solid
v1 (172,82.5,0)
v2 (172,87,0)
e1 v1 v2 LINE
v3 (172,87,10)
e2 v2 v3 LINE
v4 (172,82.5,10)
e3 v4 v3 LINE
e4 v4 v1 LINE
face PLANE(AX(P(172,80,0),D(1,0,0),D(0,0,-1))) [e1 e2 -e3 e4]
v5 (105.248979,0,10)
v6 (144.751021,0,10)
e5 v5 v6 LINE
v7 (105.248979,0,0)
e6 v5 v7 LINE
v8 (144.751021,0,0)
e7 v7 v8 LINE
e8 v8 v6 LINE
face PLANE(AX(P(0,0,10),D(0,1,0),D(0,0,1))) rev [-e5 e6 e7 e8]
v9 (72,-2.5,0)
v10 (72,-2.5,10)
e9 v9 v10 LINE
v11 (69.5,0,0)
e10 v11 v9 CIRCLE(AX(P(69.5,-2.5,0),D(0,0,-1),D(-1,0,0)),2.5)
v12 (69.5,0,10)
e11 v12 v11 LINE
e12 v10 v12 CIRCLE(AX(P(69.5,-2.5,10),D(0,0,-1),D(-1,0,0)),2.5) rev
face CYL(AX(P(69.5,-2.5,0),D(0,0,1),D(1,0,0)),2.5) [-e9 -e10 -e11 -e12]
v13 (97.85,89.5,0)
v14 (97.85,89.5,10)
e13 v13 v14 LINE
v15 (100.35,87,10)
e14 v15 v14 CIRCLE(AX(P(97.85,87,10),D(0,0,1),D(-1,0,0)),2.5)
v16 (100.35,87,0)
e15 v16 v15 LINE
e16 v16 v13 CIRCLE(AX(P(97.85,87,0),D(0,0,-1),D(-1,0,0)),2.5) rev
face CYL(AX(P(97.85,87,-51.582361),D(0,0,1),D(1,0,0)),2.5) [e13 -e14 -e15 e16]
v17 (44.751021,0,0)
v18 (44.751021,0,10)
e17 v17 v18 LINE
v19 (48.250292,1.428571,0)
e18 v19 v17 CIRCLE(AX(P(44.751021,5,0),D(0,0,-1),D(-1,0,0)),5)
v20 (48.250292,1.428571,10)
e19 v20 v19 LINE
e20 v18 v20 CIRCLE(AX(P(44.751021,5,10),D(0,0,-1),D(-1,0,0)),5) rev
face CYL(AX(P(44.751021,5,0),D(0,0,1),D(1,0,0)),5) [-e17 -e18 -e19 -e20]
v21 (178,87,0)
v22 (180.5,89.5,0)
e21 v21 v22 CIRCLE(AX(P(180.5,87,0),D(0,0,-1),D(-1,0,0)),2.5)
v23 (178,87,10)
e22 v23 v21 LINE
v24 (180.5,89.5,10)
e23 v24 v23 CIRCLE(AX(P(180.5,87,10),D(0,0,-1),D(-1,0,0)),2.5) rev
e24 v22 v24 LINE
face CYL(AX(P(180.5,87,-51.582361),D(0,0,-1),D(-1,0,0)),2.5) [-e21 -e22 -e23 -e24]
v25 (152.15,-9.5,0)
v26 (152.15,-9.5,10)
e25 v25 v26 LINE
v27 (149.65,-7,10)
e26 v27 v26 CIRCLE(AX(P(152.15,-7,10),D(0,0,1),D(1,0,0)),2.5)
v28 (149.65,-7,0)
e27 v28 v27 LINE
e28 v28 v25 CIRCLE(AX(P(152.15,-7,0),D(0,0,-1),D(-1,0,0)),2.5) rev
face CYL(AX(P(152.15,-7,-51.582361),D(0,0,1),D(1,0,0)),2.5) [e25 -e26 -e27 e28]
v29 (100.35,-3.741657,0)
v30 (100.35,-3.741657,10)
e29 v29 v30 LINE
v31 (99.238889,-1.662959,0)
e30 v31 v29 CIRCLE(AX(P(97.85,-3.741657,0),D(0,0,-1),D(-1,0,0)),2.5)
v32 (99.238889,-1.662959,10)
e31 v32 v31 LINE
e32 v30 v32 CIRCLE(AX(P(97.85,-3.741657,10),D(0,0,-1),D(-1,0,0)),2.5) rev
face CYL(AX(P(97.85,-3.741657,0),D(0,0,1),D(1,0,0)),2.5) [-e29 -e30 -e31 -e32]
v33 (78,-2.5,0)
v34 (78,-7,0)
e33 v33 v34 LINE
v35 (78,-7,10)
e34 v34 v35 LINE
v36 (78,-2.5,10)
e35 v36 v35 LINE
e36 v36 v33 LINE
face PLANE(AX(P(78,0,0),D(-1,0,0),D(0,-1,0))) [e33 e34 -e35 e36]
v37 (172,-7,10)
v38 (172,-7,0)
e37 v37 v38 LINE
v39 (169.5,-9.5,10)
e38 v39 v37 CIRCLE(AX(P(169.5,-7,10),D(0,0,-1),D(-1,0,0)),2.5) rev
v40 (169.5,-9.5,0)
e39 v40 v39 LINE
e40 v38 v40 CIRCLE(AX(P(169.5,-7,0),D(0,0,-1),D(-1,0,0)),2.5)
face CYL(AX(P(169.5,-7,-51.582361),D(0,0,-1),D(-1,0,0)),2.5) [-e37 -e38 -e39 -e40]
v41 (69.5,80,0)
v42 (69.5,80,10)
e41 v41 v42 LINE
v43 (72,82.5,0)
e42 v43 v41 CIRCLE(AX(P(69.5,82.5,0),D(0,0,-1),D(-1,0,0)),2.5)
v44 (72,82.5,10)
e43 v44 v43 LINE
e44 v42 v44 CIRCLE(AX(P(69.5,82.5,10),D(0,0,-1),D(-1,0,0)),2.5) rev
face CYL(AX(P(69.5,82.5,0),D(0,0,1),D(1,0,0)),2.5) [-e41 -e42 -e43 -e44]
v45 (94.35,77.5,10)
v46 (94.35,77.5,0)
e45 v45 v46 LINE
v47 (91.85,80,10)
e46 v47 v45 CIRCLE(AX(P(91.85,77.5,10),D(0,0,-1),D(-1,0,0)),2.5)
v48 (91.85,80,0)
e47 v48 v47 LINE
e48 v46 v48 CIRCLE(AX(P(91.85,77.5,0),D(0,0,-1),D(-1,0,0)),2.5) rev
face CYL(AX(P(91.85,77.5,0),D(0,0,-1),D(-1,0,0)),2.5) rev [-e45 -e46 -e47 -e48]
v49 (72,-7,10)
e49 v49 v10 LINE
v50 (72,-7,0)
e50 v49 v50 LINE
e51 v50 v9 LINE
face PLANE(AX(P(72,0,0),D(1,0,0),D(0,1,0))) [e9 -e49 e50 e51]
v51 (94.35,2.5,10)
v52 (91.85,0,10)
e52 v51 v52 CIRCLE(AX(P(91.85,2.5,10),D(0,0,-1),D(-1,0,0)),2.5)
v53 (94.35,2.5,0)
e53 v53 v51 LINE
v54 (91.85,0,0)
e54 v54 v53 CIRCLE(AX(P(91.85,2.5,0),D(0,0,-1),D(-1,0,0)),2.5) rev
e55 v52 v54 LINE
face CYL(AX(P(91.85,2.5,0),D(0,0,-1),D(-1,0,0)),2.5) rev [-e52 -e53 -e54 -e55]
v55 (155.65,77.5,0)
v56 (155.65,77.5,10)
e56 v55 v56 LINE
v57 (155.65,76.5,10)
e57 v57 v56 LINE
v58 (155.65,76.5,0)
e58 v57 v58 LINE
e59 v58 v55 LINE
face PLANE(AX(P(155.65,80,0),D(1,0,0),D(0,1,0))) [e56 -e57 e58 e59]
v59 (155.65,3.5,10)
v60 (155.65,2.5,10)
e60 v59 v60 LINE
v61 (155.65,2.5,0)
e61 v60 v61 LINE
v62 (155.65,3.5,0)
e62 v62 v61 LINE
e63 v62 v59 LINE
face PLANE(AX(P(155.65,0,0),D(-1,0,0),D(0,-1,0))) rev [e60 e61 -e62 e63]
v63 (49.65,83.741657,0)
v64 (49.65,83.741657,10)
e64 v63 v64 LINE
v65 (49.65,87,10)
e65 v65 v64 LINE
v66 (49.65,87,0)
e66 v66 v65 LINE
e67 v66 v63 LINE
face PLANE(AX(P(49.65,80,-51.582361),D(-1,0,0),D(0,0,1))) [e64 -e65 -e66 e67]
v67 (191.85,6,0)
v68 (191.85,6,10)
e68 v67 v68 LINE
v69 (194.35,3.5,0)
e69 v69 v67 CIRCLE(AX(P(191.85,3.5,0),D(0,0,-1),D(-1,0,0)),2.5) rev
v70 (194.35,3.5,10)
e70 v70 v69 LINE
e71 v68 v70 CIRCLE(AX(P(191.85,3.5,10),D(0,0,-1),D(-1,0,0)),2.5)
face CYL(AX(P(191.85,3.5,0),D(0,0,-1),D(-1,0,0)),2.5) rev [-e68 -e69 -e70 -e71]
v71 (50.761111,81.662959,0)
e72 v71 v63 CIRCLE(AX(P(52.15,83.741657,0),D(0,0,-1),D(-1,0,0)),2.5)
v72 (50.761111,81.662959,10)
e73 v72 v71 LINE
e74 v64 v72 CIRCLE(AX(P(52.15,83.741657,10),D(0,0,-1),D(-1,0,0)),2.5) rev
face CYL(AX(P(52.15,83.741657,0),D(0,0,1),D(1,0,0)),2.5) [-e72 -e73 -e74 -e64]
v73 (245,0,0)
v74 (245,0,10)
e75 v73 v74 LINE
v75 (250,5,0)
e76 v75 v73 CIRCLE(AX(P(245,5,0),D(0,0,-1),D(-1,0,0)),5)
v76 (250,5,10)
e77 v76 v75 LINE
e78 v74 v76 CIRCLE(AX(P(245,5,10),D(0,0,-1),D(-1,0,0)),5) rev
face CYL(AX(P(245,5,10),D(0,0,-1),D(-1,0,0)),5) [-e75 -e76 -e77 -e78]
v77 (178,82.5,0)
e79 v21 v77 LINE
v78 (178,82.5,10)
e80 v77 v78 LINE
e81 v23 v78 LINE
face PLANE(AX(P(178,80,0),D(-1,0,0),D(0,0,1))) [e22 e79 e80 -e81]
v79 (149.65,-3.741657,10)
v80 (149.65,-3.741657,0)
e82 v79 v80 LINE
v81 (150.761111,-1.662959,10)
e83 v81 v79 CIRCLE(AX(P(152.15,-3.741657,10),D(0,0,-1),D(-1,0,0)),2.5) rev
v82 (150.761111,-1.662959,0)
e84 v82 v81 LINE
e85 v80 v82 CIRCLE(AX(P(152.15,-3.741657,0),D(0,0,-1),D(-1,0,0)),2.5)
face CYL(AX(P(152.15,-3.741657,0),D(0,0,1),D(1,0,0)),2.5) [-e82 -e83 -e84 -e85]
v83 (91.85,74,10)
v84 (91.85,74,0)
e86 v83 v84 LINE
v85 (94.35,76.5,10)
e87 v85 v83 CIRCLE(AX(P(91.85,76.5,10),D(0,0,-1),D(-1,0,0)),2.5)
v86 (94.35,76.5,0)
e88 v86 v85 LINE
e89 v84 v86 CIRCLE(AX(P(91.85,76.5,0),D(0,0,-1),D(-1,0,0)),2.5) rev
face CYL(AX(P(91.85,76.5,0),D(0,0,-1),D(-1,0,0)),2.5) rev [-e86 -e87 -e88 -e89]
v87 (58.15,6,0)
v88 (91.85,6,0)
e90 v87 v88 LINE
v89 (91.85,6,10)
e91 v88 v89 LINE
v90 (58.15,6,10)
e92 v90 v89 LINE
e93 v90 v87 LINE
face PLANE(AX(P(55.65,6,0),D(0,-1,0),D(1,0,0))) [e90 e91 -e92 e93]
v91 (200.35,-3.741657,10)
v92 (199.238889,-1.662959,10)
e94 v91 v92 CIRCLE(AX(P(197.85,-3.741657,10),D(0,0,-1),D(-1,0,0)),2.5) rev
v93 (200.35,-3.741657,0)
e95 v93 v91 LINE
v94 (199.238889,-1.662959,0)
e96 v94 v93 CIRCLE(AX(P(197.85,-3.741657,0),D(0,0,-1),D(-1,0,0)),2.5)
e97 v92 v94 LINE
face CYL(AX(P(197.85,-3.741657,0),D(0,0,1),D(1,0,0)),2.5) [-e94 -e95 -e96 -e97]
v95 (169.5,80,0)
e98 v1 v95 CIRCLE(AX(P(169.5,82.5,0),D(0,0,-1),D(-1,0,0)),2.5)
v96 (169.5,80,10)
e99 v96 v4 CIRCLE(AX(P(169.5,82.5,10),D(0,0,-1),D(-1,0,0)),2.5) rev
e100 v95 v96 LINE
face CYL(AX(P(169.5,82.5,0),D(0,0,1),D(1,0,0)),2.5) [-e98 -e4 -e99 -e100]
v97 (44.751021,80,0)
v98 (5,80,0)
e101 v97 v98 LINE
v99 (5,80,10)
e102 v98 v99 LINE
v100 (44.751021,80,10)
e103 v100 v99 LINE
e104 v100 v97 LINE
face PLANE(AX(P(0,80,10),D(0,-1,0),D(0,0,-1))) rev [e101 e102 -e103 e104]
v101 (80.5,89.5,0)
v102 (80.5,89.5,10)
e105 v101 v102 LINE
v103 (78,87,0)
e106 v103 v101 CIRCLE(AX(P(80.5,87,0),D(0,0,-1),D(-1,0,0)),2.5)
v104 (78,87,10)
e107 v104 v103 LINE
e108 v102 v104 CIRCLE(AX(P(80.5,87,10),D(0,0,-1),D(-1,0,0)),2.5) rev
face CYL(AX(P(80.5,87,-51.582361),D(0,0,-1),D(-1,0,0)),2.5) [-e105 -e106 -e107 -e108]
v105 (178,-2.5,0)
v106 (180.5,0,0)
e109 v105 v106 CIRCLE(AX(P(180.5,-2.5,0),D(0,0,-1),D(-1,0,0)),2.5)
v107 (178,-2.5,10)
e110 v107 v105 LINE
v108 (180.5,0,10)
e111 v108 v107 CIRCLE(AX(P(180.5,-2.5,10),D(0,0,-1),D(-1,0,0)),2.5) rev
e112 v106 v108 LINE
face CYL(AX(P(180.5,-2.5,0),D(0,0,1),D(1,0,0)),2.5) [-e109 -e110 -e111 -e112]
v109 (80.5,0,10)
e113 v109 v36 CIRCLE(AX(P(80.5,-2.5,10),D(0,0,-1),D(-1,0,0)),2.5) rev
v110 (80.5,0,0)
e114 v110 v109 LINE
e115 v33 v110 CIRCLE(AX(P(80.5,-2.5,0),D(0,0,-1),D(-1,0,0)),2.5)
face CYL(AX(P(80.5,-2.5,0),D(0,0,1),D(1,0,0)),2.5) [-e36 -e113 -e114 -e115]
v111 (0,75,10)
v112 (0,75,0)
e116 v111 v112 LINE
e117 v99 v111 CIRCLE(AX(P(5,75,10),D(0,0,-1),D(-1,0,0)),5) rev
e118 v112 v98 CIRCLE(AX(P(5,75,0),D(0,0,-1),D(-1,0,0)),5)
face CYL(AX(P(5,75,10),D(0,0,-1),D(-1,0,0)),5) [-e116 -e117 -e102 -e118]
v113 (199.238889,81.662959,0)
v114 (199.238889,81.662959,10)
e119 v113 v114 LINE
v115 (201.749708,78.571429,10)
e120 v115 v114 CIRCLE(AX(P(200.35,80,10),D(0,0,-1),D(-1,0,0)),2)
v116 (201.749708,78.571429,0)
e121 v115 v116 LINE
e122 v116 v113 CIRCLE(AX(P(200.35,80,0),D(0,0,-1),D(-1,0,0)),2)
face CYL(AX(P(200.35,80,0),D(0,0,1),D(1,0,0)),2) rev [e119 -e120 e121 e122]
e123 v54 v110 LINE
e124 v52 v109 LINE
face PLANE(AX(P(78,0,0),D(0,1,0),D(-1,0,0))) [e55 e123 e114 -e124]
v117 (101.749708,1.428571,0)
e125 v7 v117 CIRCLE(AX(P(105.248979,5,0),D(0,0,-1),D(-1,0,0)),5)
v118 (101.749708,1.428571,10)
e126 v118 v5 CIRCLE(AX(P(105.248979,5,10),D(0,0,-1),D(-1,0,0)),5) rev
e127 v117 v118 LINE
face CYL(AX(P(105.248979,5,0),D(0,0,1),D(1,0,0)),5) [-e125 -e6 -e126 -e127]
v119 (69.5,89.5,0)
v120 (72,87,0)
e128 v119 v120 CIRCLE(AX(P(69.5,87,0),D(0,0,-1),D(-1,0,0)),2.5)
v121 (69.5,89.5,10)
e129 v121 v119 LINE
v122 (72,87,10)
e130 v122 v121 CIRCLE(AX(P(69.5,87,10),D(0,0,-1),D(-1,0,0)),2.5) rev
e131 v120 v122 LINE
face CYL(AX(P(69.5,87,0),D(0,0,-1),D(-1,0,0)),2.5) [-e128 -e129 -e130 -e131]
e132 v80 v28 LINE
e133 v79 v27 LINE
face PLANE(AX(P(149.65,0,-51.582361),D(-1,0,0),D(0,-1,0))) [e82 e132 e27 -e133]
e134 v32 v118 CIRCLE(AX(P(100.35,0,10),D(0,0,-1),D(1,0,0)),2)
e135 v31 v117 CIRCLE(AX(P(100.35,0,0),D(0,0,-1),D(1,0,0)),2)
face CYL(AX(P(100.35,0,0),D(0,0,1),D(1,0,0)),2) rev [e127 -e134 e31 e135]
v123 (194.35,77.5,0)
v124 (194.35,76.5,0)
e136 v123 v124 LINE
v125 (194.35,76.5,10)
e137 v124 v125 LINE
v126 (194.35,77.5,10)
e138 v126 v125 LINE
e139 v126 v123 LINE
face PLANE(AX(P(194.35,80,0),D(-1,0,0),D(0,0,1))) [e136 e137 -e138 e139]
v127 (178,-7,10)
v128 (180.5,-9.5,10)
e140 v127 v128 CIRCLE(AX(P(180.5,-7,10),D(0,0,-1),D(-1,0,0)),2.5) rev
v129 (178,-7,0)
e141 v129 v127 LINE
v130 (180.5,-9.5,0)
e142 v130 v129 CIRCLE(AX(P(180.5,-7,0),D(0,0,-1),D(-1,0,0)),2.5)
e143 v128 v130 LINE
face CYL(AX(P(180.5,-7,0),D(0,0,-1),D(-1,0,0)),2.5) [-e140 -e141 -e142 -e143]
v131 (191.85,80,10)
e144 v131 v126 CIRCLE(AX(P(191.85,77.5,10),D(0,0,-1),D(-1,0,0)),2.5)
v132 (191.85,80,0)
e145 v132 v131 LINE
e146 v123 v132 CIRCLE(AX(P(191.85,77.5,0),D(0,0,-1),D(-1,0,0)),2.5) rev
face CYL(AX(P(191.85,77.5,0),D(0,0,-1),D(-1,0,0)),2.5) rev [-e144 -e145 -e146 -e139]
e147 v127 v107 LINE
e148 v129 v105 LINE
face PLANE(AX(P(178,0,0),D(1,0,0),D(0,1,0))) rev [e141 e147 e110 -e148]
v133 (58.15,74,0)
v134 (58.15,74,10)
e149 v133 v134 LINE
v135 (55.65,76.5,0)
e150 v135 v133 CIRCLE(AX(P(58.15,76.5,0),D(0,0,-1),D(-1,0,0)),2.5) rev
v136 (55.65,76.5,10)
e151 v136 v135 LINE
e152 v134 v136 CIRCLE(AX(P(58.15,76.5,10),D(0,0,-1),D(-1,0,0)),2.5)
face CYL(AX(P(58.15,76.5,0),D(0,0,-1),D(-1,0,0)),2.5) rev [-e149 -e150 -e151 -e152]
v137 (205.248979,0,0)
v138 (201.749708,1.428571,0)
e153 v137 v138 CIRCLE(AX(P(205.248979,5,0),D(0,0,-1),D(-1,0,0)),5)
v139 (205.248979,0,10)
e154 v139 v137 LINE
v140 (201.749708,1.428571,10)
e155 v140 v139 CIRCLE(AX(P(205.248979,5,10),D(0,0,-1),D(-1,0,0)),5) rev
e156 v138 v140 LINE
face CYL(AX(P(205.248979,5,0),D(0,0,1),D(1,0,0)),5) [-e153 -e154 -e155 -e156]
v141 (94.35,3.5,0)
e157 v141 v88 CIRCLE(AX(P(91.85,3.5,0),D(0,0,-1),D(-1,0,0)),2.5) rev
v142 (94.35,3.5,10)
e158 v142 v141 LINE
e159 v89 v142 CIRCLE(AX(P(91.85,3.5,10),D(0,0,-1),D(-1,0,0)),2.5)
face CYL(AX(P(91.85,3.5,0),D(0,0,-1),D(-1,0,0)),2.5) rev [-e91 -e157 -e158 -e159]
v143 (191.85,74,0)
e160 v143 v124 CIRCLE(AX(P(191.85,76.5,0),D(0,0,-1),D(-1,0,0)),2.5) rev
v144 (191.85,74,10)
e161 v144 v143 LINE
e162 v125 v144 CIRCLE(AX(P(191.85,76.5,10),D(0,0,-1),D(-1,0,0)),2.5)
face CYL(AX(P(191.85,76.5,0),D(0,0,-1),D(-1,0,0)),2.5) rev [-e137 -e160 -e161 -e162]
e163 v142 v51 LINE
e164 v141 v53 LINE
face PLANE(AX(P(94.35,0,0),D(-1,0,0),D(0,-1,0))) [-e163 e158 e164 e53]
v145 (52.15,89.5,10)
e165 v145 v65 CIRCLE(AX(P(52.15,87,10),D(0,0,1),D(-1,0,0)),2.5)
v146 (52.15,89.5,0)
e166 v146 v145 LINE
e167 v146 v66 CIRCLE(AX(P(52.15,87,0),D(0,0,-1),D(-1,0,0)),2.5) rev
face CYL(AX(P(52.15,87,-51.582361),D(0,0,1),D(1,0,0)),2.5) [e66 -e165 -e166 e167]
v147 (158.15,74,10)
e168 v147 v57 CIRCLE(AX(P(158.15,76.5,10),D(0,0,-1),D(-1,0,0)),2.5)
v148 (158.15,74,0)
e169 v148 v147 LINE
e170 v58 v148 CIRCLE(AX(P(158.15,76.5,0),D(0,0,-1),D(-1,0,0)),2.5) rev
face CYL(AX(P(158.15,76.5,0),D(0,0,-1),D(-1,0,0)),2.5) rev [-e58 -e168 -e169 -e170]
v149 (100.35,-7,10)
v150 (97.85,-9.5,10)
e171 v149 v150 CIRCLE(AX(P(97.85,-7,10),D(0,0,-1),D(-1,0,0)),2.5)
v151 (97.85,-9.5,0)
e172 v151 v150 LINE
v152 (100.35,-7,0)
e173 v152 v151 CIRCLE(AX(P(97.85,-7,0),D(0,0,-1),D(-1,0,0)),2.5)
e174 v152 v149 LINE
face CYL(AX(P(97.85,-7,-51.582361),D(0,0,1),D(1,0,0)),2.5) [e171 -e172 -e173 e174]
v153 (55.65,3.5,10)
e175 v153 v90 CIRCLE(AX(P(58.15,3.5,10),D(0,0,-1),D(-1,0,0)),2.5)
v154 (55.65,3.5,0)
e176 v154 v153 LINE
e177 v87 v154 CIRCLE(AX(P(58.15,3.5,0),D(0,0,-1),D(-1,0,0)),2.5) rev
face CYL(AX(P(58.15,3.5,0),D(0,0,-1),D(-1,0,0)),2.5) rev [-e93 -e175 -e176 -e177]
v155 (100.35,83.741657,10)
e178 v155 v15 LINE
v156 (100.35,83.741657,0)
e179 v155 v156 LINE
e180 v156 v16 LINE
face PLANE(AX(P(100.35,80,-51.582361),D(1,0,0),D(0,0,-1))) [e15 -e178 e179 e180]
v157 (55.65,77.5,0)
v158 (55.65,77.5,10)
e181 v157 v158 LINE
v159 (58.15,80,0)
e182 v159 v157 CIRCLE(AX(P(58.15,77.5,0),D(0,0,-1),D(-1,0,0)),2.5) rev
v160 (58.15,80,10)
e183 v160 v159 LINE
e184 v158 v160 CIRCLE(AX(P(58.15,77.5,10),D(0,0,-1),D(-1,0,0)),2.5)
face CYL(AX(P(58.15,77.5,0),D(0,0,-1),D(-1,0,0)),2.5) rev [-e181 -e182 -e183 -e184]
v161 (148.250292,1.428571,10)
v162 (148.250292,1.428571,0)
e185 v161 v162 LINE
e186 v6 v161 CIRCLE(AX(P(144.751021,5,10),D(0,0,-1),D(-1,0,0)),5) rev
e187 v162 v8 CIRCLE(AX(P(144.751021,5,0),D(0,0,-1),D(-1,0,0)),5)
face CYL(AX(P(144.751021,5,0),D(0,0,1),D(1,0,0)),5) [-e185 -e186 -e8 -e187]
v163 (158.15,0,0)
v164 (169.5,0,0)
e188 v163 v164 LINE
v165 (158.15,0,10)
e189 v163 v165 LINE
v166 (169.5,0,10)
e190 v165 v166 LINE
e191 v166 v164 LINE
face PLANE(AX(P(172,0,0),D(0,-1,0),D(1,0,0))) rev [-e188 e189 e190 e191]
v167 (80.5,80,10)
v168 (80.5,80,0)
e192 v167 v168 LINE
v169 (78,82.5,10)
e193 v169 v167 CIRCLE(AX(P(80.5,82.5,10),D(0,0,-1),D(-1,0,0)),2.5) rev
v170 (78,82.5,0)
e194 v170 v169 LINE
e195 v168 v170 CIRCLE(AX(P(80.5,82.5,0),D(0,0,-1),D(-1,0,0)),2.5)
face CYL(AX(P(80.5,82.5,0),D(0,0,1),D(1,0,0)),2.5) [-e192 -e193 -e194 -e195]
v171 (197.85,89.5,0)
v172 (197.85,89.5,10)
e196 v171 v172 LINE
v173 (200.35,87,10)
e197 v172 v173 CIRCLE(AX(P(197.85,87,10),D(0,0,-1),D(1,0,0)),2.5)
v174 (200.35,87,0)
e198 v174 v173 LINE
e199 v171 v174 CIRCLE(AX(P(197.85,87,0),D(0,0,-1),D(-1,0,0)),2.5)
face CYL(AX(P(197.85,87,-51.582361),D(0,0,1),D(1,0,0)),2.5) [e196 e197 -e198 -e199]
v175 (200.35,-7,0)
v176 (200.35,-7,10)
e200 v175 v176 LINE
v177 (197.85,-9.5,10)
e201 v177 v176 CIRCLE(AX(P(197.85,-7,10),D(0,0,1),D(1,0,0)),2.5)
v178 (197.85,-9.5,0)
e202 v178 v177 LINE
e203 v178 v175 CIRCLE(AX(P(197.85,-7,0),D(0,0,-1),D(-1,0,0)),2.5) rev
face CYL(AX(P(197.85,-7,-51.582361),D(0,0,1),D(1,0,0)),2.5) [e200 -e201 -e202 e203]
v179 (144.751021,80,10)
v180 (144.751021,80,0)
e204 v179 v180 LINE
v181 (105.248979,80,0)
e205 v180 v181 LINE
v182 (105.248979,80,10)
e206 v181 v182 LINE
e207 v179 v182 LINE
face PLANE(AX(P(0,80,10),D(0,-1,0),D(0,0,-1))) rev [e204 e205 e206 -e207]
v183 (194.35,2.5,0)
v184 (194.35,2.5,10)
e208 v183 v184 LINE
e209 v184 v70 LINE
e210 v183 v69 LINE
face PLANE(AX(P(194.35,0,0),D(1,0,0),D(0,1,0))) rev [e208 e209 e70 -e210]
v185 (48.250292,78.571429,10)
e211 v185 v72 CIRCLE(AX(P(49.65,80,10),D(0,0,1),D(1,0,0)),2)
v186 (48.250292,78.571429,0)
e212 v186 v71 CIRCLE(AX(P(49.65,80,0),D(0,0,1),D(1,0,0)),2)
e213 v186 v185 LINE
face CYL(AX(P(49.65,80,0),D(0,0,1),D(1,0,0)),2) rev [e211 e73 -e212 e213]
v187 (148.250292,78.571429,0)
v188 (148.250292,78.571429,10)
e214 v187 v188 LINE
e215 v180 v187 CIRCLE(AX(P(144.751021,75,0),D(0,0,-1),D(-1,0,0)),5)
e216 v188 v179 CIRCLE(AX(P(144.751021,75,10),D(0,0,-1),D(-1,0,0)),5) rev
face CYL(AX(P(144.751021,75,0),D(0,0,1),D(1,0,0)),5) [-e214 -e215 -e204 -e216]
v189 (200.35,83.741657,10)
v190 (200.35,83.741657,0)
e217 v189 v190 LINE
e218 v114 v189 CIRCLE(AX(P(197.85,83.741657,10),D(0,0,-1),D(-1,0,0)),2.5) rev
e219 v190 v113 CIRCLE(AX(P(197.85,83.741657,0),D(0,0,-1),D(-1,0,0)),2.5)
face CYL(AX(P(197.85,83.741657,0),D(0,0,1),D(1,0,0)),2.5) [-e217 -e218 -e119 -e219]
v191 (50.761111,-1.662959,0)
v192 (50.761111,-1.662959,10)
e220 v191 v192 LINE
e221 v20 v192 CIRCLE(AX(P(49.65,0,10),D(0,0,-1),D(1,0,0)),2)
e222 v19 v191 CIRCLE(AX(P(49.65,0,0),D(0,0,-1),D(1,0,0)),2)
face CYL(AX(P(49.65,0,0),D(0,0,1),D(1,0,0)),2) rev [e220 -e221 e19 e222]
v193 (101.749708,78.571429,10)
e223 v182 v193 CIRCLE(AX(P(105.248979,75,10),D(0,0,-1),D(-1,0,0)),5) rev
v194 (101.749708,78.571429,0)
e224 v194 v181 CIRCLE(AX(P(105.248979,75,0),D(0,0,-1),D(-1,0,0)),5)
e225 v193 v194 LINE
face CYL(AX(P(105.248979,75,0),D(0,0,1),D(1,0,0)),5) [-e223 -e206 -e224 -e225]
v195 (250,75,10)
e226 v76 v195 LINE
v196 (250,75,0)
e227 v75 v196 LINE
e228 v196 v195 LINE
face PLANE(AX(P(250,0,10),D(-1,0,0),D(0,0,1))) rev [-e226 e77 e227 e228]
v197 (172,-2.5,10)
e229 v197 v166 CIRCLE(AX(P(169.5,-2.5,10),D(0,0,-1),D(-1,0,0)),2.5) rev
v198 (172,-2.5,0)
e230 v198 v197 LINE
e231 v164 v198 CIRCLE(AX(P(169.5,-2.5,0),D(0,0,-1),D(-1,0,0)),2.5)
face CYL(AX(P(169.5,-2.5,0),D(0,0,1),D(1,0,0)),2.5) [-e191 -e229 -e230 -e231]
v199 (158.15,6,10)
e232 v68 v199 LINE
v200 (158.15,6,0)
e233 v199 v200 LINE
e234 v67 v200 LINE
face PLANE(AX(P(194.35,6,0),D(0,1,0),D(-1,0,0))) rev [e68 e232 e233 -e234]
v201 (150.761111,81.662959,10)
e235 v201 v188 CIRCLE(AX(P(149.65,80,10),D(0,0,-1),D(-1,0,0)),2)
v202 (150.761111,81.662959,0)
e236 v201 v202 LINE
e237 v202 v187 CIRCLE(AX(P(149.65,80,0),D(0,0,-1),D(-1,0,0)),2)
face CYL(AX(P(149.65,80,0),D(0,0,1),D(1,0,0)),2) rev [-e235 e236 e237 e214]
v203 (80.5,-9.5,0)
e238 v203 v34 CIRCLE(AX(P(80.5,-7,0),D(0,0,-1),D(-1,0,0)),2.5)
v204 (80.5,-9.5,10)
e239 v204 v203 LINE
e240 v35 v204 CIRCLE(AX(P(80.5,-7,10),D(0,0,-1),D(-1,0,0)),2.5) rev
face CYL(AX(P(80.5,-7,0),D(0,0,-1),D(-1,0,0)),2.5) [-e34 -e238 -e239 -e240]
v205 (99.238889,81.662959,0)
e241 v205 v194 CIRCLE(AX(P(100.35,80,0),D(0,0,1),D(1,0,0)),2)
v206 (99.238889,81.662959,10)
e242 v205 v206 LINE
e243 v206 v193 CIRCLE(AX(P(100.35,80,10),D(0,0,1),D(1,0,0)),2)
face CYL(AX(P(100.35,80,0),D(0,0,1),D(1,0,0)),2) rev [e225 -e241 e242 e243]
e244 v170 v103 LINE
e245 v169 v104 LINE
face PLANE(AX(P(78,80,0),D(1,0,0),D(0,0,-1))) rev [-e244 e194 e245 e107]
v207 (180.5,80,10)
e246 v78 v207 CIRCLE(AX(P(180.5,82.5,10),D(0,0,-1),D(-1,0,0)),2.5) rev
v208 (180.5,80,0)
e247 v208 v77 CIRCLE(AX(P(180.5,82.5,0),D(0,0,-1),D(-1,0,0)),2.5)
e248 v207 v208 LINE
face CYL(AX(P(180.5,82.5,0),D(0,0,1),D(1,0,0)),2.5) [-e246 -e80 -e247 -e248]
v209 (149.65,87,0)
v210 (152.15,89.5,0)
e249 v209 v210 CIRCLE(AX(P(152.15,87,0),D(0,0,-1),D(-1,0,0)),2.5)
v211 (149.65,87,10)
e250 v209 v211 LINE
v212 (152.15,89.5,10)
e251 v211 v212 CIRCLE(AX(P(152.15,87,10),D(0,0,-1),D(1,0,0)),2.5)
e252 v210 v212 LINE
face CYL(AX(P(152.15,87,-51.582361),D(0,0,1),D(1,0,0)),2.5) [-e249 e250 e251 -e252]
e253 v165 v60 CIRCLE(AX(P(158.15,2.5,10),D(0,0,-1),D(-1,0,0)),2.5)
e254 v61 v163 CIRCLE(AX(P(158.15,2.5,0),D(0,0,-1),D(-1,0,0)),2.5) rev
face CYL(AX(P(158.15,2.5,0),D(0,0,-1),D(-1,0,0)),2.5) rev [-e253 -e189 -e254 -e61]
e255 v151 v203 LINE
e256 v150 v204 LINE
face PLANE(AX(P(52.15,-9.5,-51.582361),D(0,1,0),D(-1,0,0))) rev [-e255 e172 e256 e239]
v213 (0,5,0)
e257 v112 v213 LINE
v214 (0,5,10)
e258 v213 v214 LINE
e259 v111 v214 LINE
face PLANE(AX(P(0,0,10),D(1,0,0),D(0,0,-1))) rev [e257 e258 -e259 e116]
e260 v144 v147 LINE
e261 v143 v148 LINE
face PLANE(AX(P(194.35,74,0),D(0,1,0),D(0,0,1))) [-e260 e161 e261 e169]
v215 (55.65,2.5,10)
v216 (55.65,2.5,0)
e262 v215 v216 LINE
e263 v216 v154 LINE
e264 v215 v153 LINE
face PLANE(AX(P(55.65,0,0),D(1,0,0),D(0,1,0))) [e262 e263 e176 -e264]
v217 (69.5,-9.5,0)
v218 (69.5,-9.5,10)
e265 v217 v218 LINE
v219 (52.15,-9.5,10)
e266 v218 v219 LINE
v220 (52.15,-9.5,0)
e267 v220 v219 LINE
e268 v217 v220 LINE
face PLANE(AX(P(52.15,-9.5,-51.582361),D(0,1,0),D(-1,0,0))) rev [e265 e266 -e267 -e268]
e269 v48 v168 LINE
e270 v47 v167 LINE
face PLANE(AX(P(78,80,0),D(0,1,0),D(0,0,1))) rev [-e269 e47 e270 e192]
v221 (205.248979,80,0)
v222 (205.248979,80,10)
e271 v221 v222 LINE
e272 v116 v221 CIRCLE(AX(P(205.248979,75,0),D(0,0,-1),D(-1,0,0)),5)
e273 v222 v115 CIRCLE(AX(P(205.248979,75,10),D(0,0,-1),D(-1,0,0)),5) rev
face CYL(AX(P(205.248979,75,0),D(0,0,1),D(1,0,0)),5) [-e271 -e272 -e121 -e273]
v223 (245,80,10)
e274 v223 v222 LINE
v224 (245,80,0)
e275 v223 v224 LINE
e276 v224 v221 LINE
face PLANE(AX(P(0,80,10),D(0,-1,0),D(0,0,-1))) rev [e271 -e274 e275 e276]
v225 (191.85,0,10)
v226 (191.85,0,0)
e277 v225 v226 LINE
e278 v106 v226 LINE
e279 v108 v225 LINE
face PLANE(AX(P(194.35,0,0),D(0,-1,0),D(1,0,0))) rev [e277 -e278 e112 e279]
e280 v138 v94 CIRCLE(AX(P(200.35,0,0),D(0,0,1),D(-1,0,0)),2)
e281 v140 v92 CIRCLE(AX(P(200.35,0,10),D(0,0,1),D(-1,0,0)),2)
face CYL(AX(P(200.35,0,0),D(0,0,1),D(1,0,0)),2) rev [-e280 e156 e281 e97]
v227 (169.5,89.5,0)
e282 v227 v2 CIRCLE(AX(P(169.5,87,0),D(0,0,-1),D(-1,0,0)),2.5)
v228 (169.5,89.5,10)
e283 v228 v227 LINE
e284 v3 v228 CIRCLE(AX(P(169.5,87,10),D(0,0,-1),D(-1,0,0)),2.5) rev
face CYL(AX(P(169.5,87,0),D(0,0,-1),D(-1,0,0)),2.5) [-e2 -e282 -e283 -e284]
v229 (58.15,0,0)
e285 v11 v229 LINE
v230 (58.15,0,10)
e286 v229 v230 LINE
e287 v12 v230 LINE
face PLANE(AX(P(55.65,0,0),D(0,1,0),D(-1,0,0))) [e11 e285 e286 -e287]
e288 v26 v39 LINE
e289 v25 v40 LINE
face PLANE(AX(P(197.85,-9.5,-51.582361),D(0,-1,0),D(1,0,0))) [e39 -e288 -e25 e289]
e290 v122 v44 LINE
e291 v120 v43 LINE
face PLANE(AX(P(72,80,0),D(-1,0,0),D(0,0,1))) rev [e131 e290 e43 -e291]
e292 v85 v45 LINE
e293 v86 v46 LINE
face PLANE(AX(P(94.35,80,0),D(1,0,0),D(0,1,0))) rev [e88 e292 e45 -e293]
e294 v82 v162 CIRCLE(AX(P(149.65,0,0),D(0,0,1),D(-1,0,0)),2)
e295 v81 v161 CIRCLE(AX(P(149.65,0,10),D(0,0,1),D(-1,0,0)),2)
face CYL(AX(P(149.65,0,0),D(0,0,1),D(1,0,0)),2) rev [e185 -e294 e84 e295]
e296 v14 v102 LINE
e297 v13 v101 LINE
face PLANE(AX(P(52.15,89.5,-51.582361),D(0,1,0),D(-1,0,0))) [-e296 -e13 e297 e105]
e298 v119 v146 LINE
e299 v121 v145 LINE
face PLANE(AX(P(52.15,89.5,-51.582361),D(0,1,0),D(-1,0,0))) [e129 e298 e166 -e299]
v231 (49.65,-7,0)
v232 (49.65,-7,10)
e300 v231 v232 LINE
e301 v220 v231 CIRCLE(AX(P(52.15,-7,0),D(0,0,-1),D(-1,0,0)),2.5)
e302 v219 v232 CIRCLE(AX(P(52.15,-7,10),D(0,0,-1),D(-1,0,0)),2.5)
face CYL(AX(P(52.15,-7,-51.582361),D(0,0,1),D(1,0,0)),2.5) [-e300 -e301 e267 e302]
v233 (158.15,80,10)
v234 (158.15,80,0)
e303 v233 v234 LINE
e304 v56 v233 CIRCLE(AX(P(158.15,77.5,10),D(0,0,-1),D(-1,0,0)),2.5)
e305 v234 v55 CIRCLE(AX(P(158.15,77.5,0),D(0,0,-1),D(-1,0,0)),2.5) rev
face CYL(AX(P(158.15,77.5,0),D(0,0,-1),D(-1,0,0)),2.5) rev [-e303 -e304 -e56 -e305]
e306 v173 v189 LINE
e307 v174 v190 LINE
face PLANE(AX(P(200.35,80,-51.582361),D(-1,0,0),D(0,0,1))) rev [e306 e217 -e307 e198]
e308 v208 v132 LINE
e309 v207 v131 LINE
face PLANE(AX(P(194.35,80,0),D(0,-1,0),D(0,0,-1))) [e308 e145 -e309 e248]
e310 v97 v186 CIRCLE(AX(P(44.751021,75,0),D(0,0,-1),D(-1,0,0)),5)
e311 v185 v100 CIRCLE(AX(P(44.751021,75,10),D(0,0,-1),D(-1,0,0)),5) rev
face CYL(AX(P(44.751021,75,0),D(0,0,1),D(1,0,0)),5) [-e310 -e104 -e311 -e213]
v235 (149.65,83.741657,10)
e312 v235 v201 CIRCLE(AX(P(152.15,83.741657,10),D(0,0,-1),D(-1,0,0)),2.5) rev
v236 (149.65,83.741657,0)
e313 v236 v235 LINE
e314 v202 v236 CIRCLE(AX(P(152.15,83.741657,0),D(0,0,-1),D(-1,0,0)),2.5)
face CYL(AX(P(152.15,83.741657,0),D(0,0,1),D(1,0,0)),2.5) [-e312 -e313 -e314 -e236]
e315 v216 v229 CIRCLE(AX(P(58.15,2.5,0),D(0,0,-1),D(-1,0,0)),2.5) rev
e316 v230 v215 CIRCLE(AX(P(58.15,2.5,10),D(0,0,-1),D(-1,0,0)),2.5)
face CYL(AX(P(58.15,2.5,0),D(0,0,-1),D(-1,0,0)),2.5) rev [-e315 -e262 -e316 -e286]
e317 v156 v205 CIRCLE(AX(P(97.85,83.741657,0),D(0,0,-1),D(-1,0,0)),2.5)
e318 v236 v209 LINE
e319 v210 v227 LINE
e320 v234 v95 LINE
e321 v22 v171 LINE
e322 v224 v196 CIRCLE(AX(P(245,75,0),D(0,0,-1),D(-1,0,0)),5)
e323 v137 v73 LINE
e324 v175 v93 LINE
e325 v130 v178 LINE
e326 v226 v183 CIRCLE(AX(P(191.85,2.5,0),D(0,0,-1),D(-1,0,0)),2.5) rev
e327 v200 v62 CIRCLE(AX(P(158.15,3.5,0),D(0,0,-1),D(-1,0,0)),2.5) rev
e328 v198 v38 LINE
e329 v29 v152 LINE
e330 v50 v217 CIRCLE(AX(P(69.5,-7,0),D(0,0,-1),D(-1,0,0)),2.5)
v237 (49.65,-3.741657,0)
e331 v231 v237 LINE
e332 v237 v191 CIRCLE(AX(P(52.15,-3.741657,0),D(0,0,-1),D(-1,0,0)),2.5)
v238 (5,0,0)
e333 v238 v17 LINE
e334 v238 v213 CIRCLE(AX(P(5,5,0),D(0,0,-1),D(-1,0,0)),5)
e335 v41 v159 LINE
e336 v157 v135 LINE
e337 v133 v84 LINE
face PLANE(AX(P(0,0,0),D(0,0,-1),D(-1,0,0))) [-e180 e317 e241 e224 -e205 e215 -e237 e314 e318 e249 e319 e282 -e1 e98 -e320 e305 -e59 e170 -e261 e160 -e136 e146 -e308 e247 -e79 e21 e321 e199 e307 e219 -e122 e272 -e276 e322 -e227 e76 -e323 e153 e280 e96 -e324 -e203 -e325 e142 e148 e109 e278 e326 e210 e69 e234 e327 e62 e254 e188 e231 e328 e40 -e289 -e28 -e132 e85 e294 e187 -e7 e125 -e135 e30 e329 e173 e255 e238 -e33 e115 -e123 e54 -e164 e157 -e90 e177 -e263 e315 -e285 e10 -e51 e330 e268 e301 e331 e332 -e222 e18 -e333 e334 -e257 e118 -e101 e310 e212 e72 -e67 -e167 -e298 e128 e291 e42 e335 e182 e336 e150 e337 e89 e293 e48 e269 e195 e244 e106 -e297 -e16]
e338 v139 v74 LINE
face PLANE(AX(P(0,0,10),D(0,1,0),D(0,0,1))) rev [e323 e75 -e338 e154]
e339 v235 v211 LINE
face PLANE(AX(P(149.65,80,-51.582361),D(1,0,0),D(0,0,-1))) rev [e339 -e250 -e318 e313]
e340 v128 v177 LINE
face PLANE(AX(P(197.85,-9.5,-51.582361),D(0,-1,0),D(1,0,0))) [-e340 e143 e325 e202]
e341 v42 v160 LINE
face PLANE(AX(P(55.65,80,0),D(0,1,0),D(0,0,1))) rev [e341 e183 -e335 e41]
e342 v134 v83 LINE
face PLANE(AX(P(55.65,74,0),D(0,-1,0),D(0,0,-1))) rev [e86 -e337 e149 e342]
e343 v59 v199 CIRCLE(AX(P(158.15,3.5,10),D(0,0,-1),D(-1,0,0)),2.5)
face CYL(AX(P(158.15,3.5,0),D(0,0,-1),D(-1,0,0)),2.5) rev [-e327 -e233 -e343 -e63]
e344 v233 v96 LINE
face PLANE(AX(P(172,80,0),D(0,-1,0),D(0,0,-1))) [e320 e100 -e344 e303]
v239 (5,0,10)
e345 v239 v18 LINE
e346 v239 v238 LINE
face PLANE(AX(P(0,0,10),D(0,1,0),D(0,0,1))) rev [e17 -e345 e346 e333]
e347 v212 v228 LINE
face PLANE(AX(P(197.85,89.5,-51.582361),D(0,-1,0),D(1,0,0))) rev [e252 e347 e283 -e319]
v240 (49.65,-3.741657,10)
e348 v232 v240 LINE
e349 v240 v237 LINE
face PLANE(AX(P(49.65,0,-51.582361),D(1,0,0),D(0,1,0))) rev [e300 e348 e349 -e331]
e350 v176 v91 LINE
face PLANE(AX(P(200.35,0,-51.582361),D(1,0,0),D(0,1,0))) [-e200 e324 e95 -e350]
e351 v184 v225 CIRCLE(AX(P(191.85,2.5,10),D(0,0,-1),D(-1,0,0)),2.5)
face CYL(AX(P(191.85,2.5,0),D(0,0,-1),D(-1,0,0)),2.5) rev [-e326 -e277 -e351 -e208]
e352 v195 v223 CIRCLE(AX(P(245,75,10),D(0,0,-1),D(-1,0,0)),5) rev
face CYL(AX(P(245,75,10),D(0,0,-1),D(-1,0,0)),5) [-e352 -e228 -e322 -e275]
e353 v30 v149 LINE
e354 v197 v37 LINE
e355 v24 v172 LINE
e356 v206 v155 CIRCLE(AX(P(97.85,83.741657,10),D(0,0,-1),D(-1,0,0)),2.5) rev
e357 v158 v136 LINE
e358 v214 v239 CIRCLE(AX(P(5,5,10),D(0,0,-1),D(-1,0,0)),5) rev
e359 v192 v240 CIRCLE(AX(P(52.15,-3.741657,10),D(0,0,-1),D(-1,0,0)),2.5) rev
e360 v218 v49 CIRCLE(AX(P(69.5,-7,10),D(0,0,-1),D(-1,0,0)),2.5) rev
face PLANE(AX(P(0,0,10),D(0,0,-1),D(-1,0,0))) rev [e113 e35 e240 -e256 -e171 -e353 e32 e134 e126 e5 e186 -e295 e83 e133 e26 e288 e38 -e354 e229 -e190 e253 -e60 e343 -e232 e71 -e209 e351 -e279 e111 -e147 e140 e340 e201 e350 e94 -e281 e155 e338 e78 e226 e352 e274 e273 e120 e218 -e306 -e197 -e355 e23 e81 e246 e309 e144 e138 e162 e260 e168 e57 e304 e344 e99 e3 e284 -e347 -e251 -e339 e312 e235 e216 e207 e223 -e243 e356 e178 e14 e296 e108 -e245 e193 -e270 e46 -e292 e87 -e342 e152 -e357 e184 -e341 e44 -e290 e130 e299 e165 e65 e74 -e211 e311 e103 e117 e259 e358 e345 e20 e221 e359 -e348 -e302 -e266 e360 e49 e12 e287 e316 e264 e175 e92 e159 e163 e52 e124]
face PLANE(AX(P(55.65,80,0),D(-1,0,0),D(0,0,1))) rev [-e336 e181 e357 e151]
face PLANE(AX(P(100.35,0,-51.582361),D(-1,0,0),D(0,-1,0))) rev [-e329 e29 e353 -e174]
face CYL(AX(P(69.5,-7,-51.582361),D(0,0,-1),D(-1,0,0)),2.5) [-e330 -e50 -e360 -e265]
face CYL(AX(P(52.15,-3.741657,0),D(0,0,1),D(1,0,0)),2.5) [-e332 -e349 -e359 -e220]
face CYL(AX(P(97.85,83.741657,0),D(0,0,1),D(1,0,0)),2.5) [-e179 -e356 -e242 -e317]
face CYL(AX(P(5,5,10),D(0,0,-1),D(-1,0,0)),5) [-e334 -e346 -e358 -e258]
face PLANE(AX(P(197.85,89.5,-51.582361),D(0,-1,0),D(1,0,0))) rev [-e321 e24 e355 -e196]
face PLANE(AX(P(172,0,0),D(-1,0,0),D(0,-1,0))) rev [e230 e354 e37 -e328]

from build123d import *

# Parameters (mm, degrees)
SKETCH1_W            = 250
SKETCH1_H            = 80
BOSS_EXTRUDE1_DEPTH  = 10
BOSS_EXTRUDE2_DEPTH  = 10
SKETCH3_R            = 2
CUT_EXTRUDE1_DEPTH   = 266.725892604
FILLET1_R            = 2.5
FILLET1_OF_MIRROR1_R = 2.5
MIRROR3_DEPTH        = 10
MIRROR3_2_DEPTH      = 10
FILLET2_R            = 5


# Read off the part's stored shape, not the designer's step: Mirror3
with BuildPart() as part:
    # Sketch1 → Boss-Extrude1 (new body)
    with BuildSketch(Plane.XY):
        with Locations((125, 40)):
            Rectangle(SKETCH1_W, SKETCH1_H)
    extrude(amount=BOSS_EXTRUDE1_DEPTH)

    # Sketch2 → Boss-Extrude2 (add)
    with BuildSketch(Plane.XY.offset(10)):
        with BuildLine():
            Line((49.65, 80), (100.35, 80))
            Line((100.35, 80), (100.35, 87))
            ThreePointArc((100.35, 87), (99.617766953, 88.767766953), (97.85, 89.5))
            Line((97.85, 89.5), (52.15, 89.5))
            ThreePointArc((52.15, 89.5), (50.382233047, 88.767766953), (49.65, 87))
            Line((49.65, 87), (49.65, 80))
        make_face()
    boss_extrude2 = extrude(amount=-BOSS_EXTRUDE2_DEPTH)

    # Sketch3 → Cut-Extrude1 (cut, through all)
    with BuildSketch(Plane.XY.offset(10)):
        with Locations((49.65, 80)):
            Circle(SKETCH3_R)
        with Locations((100.35, 80)):
            Circle(SKETCH3_R)
        Polygon((55.65, 80), (72, 80), (72, 89.5), (78, 89.5), (78, 80), (94.35, 80), (94.35, 74), (55.65, 74), align=None)
    cut_extrude1 = extrude(amount=-CUT_EXTRUDE1_DEPTH, mode=Mode.SUBTRACT)

    # Fillet1
    fillet1_edges = [part.edges().sort_by_distance(p)[0] for p in [
        (49.65, 82, 5),
        (100.35, 82, 5),
        (55.65, 74, 5),
        (55.65, 80, 5),
        (72, 80, 5),
        (72, 89.5, 5),
        (78, 89.5, 5),
        (78, 80, 5),
        (94.35, 80, 5),
        (94.35, 74, 5),
    ]]
    fillet(fillet1_edges, radius=FILLET1_R)

    # Mirror1: Boss-Extrude2, Cut-Extrude1 across plane
    add(boss_extrude2.mirror(Plane.ZY.offset(-125)))
    add(cut_extrude1.mirror(Plane.ZY.offset(-125)), mode=Mode.SUBTRACT)

    # Fillet1 of Mirror1
    fillet1_of_mirror1_edges = [part.edges().sort_by_distance(p)[0] for p in [
        (200.35, 82, 5),
        (149.65, 82, 5),
        (194.35, 74, 5),
        (194.35, 80, 5),
        (178, 80, 5),
        (178, 89.5, 5),
        (172, 89.5, 5),
        (172, 80, 5),
        (155.65, 80, 5),
        (155.65, 74, 5),
    ]]
    fillet(fillet1_of_mirror1_edges, radius=FILLET1_OF_MIRROR1_R)

    # Mirror3 outline → Mirror3 (cut)
    with BuildSketch(Plane.XY):
        with BuildLine():
            Line((47.65, 0), (51.65, 0))
            ThreePointArc((51.65, 0), (49.65, 2), (47.65, 0))
        make_face()
        with BuildLine():
            ThreePointArc((202.35, 0), (200.35, 2), (198.35, 0))
            Line((198.35, 0), (202.35, 0))
        make_face()
        with BuildLine():
            ThreePointArc((151.65, 0), (149.65, 2), (147.65, 0))
            Line((147.65, 0), (151.65, 0))
        make_face()
        with BuildLine():
            ThreePointArc((102.35, 0), (100.35, 2), (98.35, 0))
            Line((98.35, 0), (102.35, 0))
        make_face()
        with BuildLine():
            ThreePointArc((55.65, 2.5), (56.382233047, 0.732233047), (58.15, 0))
            Line((58.15, 0), (91.85, 0))
            ThreePointArc((91.85, 0), (93.617766953, 0.732233047), (94.35, 2.5))
            Line((94.35, 2.5), (94.35, 3.5))
            ThreePointArc((94.35, 3.5), (93.617766953, 5.267766953), (91.85, 6))
            Line((91.85, 6), (58.15, 6))
            ThreePointArc((58.15, 6), (56.382233047, 5.267766953), (55.65, 3.5))
            Line((55.65, 3.5), (55.65, 2.5))
        make_face()
        with BuildLine():
            ThreePointArc((155.65, 2.5), (156.382233047, 0.732233047), (158.15, 0))
            Line((158.15, 0), (191.85, 0))
            ThreePointArc((191.85, 0), (193.617766953, 0.732233047), (194.35, 2.5))
            Line((194.35, 2.5), (194.35, 3.5))
            ThreePointArc((194.35, 3.5), (193.617766953, 5.267766953), (191.85, 6))
            Line((191.85, 6), (158.15, 6))
            ThreePointArc((158.15, 6), (156.382233047, 5.267766953), (155.65, 3.5))
            Line((155.65, 3.5), (155.65, 2.5))
        make_face()
    extrude(amount=MIRROR3_DEPTH, mode=Mode.SUBTRACT)

    # Mirror3 2 outline → Mirror3 2 (add)
    with BuildSketch(Plane.XY):
        with BuildLine():
            Line((169.5, 0), (151.65, 0))
            ThreePointArc((151.65, 0), (151.413834207, -0.942809042), (150.761111111, -1.662958839))
            ThreePointArc((150.761111111, -1.662958839), (149.945207241, -2.563146085), (149.65, -3.741657387))
            Line((149.65, -3.741657387), (149.65, -7))
            ThreePointArc((149.65, -7), (150.382233047, -8.767766953), (152.15, -9.5))
            Line((152.15, -9.5), (169.5, -9.5))
            ThreePointArc((169.5, -9.5), (171.267766953, -8.767766953), (172, -7))
            Line((172, -7), (172, -2.5))
            ThreePointArc((172, -2.5), (171.267766953, -0.732233047), (169.5, 0))
        make_face()
        with BuildLine():
            Line((49.65, -3.741657387), (49.65, -7))
            ThreePointArc((49.65, -7), (50.382233047, -8.767766953), (52.15, -9.5))
            Line((52.15, -9.5), (69.5, -9.5))
            ThreePointArc((69.5, -9.5), (71.267766953, -8.767766953), (72, -7))
            Line((72, -7), (72, -2.5))
            ThreePointArc((72, -2.5), (71.267766953, -0.732233047), (69.5, 0))
            Line((69.5, 0), (51.65, 0))
            ThreePointArc((51.65, 0), (51.413834207, -0.942809042), (50.761111111, -1.662958839))
            ThreePointArc((50.761111111, -1.662958839), (49.945207241, -2.563146085), (49.65, -3.741657387))
        make_face()
        with BuildLine():
            Line((98.35, 0), (80.5, 0))
            ThreePointArc((80.5, 0), (78.732233047, -0.732233047), (78, -2.5))
            Line((78, -2.5), (78, -7))
            ThreePointArc((78, -7), (78.732233047, -8.767766953), (80.5, -9.5))
            Line((80.5, -9.5), (97.85, -9.5))
            ThreePointArc((97.85, -9.5), (99.617766953, -8.767766953), (100.35, -7))
            Line((100.35, -7), (100.35, -3.741657387))
            ThreePointArc((100.35, -3.741657387), (100.054792759, -2.563146085), (99.238888889, -1.662958839))
            ThreePointArc((99.238888889, -1.662958839), (98.586165793, -0.942809042), (98.35, 0))
        make_face()
        with BuildLine():
            Line((198.35, 0), (180.5, 0))
            ThreePointArc((180.5, 0), (178.732233047, -0.732233047), (178, -2.5))
            Line((178, -2.5), (178, -7))
            ThreePointArc((178, -7), (178.732233047, -8.767766953), (180.5, -9.5))
            Line((180.5, -9.5), (197.85, -9.5))
            ThreePointArc((197.85, -9.5), (199.617766953, -8.767766953), (200.35, -7))
            Line((200.35, -7), (200.35, -3.741657387))
            ThreePointArc((200.35, -3.741657387), (200.054792759, -2.563146085), (199.238888889, -1.662958839))
            ThreePointArc((199.238888889, -1.662958839), (198.586165793, -0.942809042), (198.35, 0))
        make_face()
    extrude(amount=MIRROR3_2_DEPTH)

    # Fillet2
    fillet2_edges = [part.edges().sort_by_distance(p)[0] for p in [
        (202.35, 80, 5),
        (147.65, 80, 5),
        (202.35, 0, 5),
        (147.65, 0, 5),
        (47.65, 80, 5),
        (47.65, 0, 5),
        (102.35, 0, 5),
        (102.35, 80, 5),
        (0, 80, 5),
        (250, 80, 5),
        (250, 0, 5),
        (0, 0, 5),
    ]]
    fillet(fillet2_edges, radius=FILLET2_R)


solid = part.part
